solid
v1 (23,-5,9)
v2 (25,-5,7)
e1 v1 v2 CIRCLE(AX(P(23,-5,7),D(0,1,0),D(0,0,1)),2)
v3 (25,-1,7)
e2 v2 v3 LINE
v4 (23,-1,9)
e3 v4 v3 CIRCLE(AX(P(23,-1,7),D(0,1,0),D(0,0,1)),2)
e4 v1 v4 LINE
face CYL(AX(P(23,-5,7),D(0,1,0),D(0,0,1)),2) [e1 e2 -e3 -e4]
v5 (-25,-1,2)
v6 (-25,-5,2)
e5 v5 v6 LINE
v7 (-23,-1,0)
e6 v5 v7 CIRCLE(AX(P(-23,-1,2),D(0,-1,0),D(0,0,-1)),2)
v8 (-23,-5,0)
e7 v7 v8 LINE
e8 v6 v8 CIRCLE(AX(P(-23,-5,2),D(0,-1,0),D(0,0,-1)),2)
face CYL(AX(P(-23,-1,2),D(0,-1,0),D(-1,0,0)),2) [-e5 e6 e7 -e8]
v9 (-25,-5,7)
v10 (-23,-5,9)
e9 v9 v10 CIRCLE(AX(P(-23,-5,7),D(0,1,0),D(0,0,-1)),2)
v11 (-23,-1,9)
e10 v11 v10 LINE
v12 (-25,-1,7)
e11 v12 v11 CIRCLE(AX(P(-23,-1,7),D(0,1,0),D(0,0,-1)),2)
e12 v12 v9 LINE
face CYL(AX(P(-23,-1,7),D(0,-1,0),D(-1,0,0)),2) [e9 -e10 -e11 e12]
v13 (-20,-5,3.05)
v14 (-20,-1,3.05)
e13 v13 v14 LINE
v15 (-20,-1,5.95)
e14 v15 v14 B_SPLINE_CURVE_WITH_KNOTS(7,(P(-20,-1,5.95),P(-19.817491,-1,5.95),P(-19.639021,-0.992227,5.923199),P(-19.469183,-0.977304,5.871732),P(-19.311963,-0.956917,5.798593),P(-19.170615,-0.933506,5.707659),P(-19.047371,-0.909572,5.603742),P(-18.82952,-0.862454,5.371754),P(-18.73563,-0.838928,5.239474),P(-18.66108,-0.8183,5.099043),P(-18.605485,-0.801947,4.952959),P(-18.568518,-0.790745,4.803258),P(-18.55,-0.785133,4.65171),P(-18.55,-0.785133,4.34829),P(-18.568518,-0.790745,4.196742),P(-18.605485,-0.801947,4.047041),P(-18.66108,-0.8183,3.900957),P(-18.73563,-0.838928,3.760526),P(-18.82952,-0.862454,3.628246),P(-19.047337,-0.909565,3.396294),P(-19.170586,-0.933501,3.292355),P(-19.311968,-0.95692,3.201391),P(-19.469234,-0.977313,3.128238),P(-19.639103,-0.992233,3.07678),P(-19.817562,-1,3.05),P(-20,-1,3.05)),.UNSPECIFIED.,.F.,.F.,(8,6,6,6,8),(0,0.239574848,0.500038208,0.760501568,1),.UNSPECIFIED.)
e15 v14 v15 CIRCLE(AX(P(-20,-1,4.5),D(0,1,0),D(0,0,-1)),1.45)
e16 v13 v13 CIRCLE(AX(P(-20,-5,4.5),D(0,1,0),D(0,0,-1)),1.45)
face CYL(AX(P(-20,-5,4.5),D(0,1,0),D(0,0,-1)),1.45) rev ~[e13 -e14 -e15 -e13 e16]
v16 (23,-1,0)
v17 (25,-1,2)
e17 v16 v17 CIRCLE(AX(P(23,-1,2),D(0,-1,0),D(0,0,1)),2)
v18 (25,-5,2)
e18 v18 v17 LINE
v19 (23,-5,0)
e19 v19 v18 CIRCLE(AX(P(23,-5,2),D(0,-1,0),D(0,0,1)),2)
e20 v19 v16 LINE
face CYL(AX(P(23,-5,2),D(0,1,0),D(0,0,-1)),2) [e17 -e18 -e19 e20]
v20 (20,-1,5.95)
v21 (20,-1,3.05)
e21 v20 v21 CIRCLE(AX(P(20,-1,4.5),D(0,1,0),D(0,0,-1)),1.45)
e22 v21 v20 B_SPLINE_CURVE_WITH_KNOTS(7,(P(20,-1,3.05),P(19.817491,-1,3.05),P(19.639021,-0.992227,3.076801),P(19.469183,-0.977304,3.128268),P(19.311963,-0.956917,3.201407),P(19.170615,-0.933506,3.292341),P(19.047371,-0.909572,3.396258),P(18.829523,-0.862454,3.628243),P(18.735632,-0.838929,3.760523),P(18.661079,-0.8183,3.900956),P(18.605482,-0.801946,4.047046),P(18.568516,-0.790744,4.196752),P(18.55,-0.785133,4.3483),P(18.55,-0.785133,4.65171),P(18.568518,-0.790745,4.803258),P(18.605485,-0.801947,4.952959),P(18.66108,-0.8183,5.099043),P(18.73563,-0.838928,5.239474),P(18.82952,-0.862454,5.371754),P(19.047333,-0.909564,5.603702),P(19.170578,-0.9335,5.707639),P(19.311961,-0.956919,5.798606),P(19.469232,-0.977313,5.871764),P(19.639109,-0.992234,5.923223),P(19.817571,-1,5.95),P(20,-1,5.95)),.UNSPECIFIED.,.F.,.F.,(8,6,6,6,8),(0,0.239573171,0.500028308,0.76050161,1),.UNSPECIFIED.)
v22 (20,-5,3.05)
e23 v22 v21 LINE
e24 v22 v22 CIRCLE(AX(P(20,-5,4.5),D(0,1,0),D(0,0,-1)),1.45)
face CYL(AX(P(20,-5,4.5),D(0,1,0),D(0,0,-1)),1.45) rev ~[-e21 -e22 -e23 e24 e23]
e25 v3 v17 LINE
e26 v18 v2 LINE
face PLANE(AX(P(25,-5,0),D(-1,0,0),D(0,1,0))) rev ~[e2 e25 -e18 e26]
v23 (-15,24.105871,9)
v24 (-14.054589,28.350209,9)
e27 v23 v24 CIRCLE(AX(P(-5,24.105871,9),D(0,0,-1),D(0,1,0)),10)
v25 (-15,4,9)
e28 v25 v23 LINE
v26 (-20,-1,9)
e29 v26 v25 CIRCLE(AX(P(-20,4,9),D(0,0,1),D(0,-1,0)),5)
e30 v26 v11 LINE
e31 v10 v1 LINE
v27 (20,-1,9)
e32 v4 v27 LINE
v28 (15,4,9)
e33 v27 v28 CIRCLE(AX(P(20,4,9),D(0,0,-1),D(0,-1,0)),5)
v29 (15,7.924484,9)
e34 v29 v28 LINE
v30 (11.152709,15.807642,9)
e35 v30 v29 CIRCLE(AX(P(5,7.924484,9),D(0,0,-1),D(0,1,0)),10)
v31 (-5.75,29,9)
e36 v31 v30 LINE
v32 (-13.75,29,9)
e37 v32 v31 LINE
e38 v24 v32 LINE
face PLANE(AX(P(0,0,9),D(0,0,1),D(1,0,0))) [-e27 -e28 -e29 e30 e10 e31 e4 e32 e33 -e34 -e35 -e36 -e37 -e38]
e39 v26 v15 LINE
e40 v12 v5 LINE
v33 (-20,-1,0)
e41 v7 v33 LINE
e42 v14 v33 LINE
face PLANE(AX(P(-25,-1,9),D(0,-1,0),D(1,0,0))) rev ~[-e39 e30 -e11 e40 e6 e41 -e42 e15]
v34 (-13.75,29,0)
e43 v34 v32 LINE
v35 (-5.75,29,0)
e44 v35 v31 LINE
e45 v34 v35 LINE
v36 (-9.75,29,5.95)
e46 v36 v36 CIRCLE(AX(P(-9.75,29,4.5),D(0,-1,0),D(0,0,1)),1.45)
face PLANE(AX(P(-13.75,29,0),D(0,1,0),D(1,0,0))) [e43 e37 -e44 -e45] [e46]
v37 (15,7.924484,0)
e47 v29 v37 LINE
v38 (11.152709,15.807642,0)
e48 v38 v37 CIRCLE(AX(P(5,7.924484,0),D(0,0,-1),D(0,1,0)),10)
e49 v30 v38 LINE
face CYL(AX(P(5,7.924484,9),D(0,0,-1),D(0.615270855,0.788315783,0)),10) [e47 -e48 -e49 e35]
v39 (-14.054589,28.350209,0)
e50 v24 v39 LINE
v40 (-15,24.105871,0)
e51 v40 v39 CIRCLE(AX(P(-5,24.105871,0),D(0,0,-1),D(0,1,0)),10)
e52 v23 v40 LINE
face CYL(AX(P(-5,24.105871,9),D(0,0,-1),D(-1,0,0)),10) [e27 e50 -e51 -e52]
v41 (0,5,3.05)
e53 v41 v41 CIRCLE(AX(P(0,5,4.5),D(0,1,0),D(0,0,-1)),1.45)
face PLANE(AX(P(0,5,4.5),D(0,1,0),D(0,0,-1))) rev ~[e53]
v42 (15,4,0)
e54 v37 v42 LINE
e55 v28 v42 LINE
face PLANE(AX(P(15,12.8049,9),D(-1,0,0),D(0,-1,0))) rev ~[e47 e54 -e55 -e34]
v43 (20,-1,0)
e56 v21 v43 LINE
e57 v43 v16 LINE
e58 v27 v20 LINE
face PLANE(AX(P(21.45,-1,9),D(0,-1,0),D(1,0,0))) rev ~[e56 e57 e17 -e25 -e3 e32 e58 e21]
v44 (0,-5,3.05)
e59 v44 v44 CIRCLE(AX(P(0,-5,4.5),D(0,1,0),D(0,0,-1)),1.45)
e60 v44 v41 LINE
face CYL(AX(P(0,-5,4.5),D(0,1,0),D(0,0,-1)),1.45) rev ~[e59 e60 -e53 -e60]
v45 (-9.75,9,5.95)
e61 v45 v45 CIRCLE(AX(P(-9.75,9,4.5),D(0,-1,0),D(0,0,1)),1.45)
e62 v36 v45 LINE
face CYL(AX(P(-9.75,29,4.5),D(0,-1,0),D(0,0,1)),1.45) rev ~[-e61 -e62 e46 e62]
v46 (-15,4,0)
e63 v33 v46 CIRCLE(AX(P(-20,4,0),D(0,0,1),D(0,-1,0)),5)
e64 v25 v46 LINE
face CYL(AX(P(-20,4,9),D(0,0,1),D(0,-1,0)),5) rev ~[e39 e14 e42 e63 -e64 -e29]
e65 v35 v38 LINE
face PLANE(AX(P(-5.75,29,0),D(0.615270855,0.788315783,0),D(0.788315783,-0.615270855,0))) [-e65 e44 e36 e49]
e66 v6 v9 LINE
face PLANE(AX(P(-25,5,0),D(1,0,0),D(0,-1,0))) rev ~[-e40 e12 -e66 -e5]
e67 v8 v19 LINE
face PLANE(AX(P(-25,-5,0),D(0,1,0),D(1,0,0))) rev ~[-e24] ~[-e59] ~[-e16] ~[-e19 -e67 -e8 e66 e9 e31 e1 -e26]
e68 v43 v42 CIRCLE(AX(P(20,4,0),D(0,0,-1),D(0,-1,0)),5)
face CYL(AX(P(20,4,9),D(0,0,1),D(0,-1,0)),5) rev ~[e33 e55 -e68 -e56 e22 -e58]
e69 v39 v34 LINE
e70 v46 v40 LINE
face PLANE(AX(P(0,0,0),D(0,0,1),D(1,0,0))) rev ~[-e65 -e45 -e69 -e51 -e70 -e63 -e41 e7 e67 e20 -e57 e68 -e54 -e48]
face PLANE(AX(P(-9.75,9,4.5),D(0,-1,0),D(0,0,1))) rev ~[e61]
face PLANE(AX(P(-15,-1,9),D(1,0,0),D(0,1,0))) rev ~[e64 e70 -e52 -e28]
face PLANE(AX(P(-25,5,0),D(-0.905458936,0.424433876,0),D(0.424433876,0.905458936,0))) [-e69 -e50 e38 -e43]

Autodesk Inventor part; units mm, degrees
ref_plane "YZ Plane" through (0, 0, 0) normal (1, 0, 0) x (0, 1, 0)
ref_plane "XZ Plane" through (0, 0, 0) normal (0, 1, 0) x (-1, 0, 0)
ref_plane "XY Plane" through (0, 0, 0) normal (0, 0, 1) x (1, 0, 0)
sketch "Sketch1" plane through (0, 0, 0) normal (0, 0, 1) x (1, 0, 0)
  line L0 (-25, -5) -> (25, -5)
  line L1 (25, -5) -> (25, 5)
  line L2 (25, 5) -> (-25, 5)
  line L3 (-25, 5) -> (-25, -5)
  line L4 (-25, -5) -> (25, 5) construction
  line L5 (25, -5) -> (-25, 5) construction
  line L6 (-25, 5) -> (-13.75, 29)
  line L7 (-13.75, 29) -> (-5.75, 29)
  line L8 (-5.75, 29) -> (25, 5)
  line L9 (-9.75, 29) -> (-9.75, 5) construction
  point P0 (0, 0)
  dimension "d0" = 15.25
  dimension "d1" = 50
  dimension "d2" = 34
  dimension "d3" = 8
  dimension "d4" = 10
extrude "Extrusion1" add sketch "Sketch1" along normal blind 9
sketch "Sketch2" plane through (-25, -5, 0) normal (0, -1, 0) x (1, 0, 0)
  line L0 (0, 0) -> (50, 0) projected
  line L1 (50, 0) -> (50, 9) projected
  line L2 (0, 9) -> (50, 9) projected
  line L3 (0, 0) -> (0, 9) projected
  point P0 (25, 0)
  point P1 (5, 4.5)
  point P2 (25, 4.5)
  point P3 (45, 4.5)
  point P4 (50, 4.5)
  dimension "d7" = 20
  dimension "d8" = 20
  dimension "d9" = 5
hole "Hole1" at (20, -5, 4.5) at (-20, -5, 4.5) at (0, -5, 4.5) direction (0, 1, 0) diameter 2.9 depth 10
sketch "Sketch3" plane through (-13.75, 29, 0) normal (0, 1, 0) x (1, 0, 0)
  line L0 (8, 0) -> (0, 0) projected
  line L1 (0, 0) -> (0, -9) projected
  line L2 (8, -9) -> (0, -9) projected
  line L3 (8, 0) -> (8, -9) projected
  point P0 (13.75, 0)
  point P1 (4, -4.5)
  point P2 (8, -4.5)
  point P3 (4, 0)
hole "Hole2" at (-9.75, 29, 4.5) direction (0, -1, 0) diameter 2.9 depth 20
sketch "Sketch4" plane through (0, 0, 9) normal (0, 0, 1) x (1, 0, 0)
  line L0 (-11.2, 9) -> (-11.2, 29) projected
  line L1 (-21.45, 5) -> (-21.45, -5) projected
  line L2 (-18.55, 5) -> (-18.55, -5) projected
  line L3 (18.55, 5) -> (18.55, -5) projected
  line L4 (-5.75, 29) -> (-13.75, 29) projected
  line L5 (-13.75, 29) -> (-25, 5) projected
  line L6 (-25, 5) -> (-25, -5) projected
  line L7 (-25, -5) -> (25, -5) projected
  line L8 (25, -5) -> (25, 5) projected
  line L9 (25, 5) -> (-5.75, 29) projected
  line L10 (21.45, 5) -> (21.45, -5) projected
  line L11 (-25, -1) -> (25, -1)
  line L12 (-15, -1) -> (-15, 26.3333)
  line L13 (15, 12.8049) -> (15, -1)
  point P0 (0, 0)
  dimension "d25" = 4
  dimension "d26" = 3.55
  dimension "d27" = 3.55
extrude "Extrusion2" cut sketch "Sketch4" against normal through all contours L11 L6 L5 L12 | L13 L9 L8 L11
fillet "Fillet2" radius 2 4 edges at (-25, -3, 9) (-25, -3, 0) (25, -3, 9) (25, -3, 0)
fillet "Fillet3" radius 5 2 edges at (15, -1, 4.5) (-15, -1, 4.5)
fillet "Fillet4" radius 10 2 edges at (15, 12.8049, 4.5) (-15, 26.3333, 4.5)
equation "\"d8\" = d7"
equation "\"d27\" = d26"
properties part number "RightLevelBlock" material "ABS Plastic"
